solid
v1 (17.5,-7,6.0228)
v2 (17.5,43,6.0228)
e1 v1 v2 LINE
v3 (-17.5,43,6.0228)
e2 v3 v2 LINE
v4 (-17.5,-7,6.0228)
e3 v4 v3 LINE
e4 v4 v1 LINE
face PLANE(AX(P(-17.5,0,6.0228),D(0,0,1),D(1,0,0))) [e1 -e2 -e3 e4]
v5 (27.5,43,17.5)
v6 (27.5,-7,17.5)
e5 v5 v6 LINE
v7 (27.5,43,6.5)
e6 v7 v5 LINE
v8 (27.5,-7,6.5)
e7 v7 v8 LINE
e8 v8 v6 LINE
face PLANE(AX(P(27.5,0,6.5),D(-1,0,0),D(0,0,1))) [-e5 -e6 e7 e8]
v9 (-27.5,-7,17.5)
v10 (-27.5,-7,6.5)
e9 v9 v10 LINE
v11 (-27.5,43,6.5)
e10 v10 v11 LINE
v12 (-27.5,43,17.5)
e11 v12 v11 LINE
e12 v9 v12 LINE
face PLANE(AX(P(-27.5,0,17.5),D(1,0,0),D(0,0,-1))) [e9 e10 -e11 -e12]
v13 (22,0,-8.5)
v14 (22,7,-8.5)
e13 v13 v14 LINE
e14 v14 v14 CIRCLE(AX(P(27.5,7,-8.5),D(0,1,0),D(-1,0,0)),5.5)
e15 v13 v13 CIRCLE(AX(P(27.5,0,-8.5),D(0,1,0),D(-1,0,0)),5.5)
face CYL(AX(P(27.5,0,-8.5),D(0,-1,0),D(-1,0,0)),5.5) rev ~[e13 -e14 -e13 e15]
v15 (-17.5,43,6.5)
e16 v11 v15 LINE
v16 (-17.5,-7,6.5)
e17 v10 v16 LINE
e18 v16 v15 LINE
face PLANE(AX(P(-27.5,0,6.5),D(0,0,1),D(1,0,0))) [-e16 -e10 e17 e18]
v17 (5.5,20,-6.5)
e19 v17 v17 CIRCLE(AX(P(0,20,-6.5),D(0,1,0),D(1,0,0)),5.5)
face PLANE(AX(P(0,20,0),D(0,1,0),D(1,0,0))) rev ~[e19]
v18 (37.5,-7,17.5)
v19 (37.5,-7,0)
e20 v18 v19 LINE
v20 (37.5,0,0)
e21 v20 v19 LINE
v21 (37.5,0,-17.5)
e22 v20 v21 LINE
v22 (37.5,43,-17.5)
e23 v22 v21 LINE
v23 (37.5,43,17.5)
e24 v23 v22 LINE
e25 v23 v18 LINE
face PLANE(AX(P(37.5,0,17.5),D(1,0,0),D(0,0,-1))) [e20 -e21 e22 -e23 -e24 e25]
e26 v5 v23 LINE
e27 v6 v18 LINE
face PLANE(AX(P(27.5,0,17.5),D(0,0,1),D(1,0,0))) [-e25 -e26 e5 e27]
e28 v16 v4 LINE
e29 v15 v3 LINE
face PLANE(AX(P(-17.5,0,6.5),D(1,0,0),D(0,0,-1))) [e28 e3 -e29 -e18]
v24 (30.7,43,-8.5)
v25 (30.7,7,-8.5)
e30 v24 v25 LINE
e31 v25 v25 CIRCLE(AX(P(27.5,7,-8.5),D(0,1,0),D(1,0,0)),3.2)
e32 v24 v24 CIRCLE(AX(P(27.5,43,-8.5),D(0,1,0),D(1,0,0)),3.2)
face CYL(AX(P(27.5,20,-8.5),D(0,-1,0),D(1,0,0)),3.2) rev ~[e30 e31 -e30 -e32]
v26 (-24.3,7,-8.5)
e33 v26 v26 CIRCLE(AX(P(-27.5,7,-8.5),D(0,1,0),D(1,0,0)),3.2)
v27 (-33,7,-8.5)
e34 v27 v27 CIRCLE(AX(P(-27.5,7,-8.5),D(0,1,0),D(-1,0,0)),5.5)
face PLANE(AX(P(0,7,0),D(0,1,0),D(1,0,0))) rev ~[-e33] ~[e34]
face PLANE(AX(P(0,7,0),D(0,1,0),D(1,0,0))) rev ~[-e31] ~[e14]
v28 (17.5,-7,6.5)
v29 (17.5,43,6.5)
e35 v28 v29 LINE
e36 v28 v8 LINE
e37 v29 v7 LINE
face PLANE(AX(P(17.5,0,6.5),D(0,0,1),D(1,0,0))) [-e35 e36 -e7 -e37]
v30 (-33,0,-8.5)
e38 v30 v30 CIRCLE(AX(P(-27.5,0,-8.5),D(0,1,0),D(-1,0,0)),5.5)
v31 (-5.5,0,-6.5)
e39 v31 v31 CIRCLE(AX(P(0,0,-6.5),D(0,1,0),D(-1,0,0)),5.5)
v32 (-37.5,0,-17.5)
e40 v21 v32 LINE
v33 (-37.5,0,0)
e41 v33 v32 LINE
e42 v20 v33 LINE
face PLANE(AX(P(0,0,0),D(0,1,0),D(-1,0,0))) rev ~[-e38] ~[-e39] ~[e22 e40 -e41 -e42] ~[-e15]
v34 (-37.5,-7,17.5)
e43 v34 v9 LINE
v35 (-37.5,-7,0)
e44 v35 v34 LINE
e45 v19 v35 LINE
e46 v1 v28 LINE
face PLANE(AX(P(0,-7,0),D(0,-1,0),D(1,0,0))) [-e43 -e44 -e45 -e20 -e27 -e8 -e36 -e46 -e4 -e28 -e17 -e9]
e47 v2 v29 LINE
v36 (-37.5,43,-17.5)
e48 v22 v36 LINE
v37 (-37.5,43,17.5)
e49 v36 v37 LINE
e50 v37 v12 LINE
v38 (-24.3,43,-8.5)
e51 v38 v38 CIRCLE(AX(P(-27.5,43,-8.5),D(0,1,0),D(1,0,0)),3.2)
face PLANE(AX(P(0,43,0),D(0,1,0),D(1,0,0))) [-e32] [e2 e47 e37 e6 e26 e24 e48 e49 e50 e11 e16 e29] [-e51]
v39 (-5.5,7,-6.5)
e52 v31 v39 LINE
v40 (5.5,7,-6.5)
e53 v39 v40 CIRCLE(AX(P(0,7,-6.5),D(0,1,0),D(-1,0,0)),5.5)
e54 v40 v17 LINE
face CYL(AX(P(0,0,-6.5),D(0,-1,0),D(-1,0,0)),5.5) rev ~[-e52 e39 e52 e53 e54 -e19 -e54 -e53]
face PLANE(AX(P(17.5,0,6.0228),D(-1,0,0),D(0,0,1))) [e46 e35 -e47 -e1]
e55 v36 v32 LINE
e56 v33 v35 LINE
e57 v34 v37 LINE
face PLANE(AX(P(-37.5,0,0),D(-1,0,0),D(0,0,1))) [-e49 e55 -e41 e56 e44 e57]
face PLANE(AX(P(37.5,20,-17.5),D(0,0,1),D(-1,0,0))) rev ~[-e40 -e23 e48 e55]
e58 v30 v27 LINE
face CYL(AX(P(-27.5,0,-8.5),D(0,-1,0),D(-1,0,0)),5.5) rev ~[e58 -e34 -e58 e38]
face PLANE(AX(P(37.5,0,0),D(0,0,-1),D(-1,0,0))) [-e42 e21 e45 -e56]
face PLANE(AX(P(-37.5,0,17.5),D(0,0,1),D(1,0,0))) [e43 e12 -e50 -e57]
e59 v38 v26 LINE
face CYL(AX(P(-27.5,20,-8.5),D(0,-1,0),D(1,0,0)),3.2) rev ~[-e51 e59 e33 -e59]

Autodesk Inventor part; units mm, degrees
ref_plane "YZ Plane" through (0, 0, 0) normal (1, 0, 0) x (0, 1, 0)
ref_plane "XZ Plane" through (0, 0, 0) normal (0, 1, 0) x (-1, 0, 0)
ref_plane "XY Plane" through (0, 0, 0) normal (0, 0, 1) x (1, 0, 0)
sketch "Sketch1" plane through (0, 0, 0) normal (0, 1, 0) x (-1, 0, 0)
  line L0 (-37.5, -17.5) -> (37.5, -17.5)
  line L1 (37.5, -17.5) -> (37.5, 17.5)
  line L2 (-37.5, 17.5) -> (-37.5, -17.5)
  line L3 (-37.5, -17.5) -> (37.5, 17.5) construction
  line L4 (37.5, -17.5) -> (-37.5, 17.5) construction
  line L5 (37.5, 17.5) -> (27.5, 17.5)
  line L6 (27.5, 17.5) -> (27.5, 6.5)
  line L7 (27.5, 6.5) -> (17.5, 6.5)
  line L8 (17.5, 6.5) -> (17.5, 6.0228)
  line L9 (17.5, 6.0228) -> (-17.5, 6.0228)
  line L10 (-17.5, 6.0228) -> (-17.5, 6.5)
  line L11 (-17.5, 6.5) -> (-27.5, 6.5)
  line L12 (-27.5, 6.5) -> (-27.5, 17.5)
  circle A0 centre (27.5, -8.5) radius 5.5
  circle A1 centre (-27.5, -8.5) radius 5.5
  circle A2 centre (0, -6.5) radius 5.5
  line L13 (37.5, 17.5) -> (27.5, 17.5)
  line L14 (-27.5, 17.5) -> (-37.5, 17.5)
  line L15 (-37.5, 1.5) -> (37.5, 1.5)
  line L16 (-37.5, 17.5) -> (-37.5, 1.5)
  line L17 (37.5, 1.5) -> (37.5, 17.5)
  line L18 (27.5, 17.5) -> (27.5, 6.5)
  line L19 (17.5, 6.5) -> (17.5, 6.0228)
  line L20 (-17.5, 6.0228) -> (-17.5, 6.5)
  line L21 (-27.5, 6.5) -> (-27.5, 17.5)
  line L22 (-37.5, 17.5) -> (-37.5, 1.5)
  point P0 (0, 0)
  point P1 (-32.5, 17.5)
  dimension "d0" = 75
  dimension "d1" = 35
  dimension "d2" = 10
  dimension "d3" = 11
  dimension "d4" = 10
  dimension "d5" = 35
  dimension "d6" = 10
  dimension "d7" = 11
  dimension "d8" = 11
  dimension "d10" = 11
  dimension "d12" = 27.5
  dimension "d13" = 27.5
  dimension "d41" = 16
extrude "Extrusion1" add sketch "Sketch1" along normal blind 7
sketch "Sketch2" plane through (0, 7, 0) normal (0, 1, 0) x (1, 0, 0)
  line L0 (-37.5, 17.5) -> (-37.5, -17.5) projected
  line L1 (-37.5, -17.5) -> (-37.5, 17.5)
  line L2 (37.5, 17.5) -> (-37.5, 17.5) projected
  line L3 (-37.5, 17.5) -> (37.5, 17.5)
  line L4 (37.5, -17.5) -> (37.5, 17.5) projected
  line L5 (37.5, 17.5) -> (37.5, -17.5)
  line L6 (27.5, -17.5) -> (37.5, -17.5) projected
  line L7 (37.5, -17.5) -> (27.5, -17.5)
  line L8 (27.5, -6.5) -> (27.5, -17.5) projected
  line L9 (27.5, -17.5) -> (27.5, -6.5)
  line L10 (17.5, -6.5) -> (27.5, -6.5) projected
  line L11 (27.5, -6.5) -> (17.5, -6.5)
  line L12 (17.5, -6.0228) -> (17.5, -6.5) projected
  line L13 (17.5, -6.5) -> (17.5, -6.0228)
  line L14 (-17.5, -6.0228) -> (17.5, -6.0228) projected
  line L15 (17.5, -6.0228) -> (-17.5, -6.0228)
  line L16 (-17.5, -6.0228) -> (-17.5, -6.5)
  line L17 (-27.5, -6.5) -> (-17.5, -6.5) projected
  line L18 (-17.5, -6.5) -> (-27.5, -6.5)
  line L19 (-27.5, -17.5) -> (-27.5, -6.5) projected
  line L20 (-27.5, -6.5) -> (-27.5, -17.5)
  line L21 (-37.5, -17.5) -> (-27.5, -17.5) projected
  line L22 (-27.5, -17.5) -> (-37.5, -17.5)
  circle A0 centre (27.5, 8.5) radius 3.2
  circle A1 centre (-27.5, 8.5) radius 3.2
  circle A2 centre (0, 6.5) radius 5.5
  point P0 (0, 0)
  point P1 (-32.5, -17.5)
  dimension "d17" = 6.4
  dimension "d24" = 6.4
  dimension "d25" = 27.5
  dimension "d26" = 27.5
  dimension "d27" = 26
  dimension "d28" = 26
  dimension "d29" = 11
  dimension "d30" = 24
extrude "Extrusion2" add sketch "Sketch2" along normal blind 13
sketch "Sketch3" plane through (0, 20, 0) normal (0, 1, 0) x (1, 0, 0)
  line L0 (-37.5, -17.5) -> (-27.5, -17.5) projected
  line L1 (-37.5, -17.5) -> (-27.5, -17.5)
  line L2 (-27.5, -17.5) -> (-27.5, -6.5) projected
  line L3 (-27.5, -17.5) -> (-27.5, -6.5)
  line L4 (-27.5, -6.5) -> (-17.5, -6.5) projected
  line L5 (-27.5, -6.5) -> (-17.5, -6.5)
  line L6 (-17.5, -6.5) -> (-17.5, -6.0228) projected
  line L7 (-17.5, -6.5) -> (-17.5, -6.0228)
  line L8 (-17.5, -6.0228) -> (17.5, -6.0228) projected
  line L9 (-17.5, -6.0228) -> (17.5, -6.0228)
  line L10 (17.5, -6.0228) -> (17.5, -6.5) projected
  line L11 (17.5, -6.0228) -> (17.5, -6.5)
  line L12 (17.5, -6.5) -> (27.5, -6.5) projected
  line L13 (17.5, -6.5) -> (27.5, -6.5)
  line L14 (27.5, -6.5) -> (27.5, -17.5) projected
  line L15 (27.5, -6.5) -> (27.5, -17.5)
  line L16 (27.5, -17.5) -> (37.5, -17.5) projected
  line L17 (27.5, -17.5) -> (37.5, -17.5)
  line L18 (37.5, 17.5) -> (-37.5, 17.5) projected
  line L19 (37.5, -17.5) -> (37.5, 17.5)
  line L20 (37.5, 17.5) -> (-37.5, 17.5)
  line L21 (-37.5, 17.5) -> (-37.5, -17.5) projected
  line L22 (-37.5, 17.5) -> (-37.5, -17.5)
  circle A0 centre (-27.5, 8.5) radius 3.2
  circle A1 centre (27.5, 8.5) radius 3.2
  point P0 (0, 0)
  point P1 (0, -6.0228)
  point P2 (0, -6.0228)
  dimension "d33" = 6.4
  dimension "d34" = 6.4
  dimension "d35" = 26
  dimension "d36" = 27.5
  dimension "d37" = 27.5
extrude "Extrusion3" add sketch "Sketch3" along normal blind 23
sketch "Sketch5" plane through (0, 0, 0) normal (0, -1, 0) x (1, 0, 0)
  line L0 (37.5, 17.5) -> (37.5, -17.5) projected
  line L1 (37.5, 0) -> (-37.5, 0)
  line L2 (-37.5, -17.5) -> (-37.5, 17.5) projected
  line L3 (-37.5, 17.5) -> (-27.5, 17.5) projected
  line L4 (-37.5, 17.5) -> (-27.5, 17.5)
  line L5 (-27.5, 17.5) -> (-27.5, 6.5) projected
  line L6 (-27.5, 17.5) -> (-27.5, 6.5)
  line L7 (-27.5, 6.5) -> (-17.5, 6.5) projected
  line L8 (-27.5, 6.5) -> (-17.5, 6.5)
  line L9 (-17.5, 6.0228) -> (17.5, 6.0228) projected
  line L10 (-17.5, 6.5) -> (-17.5, 6.0228)
  line L11 (-17.5, 6.0228) -> (17.5, 6.0228)
  line L12 (17.5, 6.0228) -> (17.5, 6.5)
  line L13 (17.5, 6.5) -> (27.5, 6.5) projected
  line L14 (17.5, 6.5) -> (27.5, 6.5)
  line L15 (27.5, 6.5) -> (27.5, 17.5) projected
  line L16 (27.5, 6.5) -> (27.5, 17.5)
  line L17 (27.5, 17.5) -> (37.5, 17.5) projected
  line L18 (27.5, 17.5) -> (37.5, 17.5)
  line L19 (37.5, 17.5) -> (37.5, 0)
  point P0 (0, 0)
extrude "Extrusion4" add sketch "Sketch5" along normal blind 7
properties part number "Lose backe" material "Steel"
